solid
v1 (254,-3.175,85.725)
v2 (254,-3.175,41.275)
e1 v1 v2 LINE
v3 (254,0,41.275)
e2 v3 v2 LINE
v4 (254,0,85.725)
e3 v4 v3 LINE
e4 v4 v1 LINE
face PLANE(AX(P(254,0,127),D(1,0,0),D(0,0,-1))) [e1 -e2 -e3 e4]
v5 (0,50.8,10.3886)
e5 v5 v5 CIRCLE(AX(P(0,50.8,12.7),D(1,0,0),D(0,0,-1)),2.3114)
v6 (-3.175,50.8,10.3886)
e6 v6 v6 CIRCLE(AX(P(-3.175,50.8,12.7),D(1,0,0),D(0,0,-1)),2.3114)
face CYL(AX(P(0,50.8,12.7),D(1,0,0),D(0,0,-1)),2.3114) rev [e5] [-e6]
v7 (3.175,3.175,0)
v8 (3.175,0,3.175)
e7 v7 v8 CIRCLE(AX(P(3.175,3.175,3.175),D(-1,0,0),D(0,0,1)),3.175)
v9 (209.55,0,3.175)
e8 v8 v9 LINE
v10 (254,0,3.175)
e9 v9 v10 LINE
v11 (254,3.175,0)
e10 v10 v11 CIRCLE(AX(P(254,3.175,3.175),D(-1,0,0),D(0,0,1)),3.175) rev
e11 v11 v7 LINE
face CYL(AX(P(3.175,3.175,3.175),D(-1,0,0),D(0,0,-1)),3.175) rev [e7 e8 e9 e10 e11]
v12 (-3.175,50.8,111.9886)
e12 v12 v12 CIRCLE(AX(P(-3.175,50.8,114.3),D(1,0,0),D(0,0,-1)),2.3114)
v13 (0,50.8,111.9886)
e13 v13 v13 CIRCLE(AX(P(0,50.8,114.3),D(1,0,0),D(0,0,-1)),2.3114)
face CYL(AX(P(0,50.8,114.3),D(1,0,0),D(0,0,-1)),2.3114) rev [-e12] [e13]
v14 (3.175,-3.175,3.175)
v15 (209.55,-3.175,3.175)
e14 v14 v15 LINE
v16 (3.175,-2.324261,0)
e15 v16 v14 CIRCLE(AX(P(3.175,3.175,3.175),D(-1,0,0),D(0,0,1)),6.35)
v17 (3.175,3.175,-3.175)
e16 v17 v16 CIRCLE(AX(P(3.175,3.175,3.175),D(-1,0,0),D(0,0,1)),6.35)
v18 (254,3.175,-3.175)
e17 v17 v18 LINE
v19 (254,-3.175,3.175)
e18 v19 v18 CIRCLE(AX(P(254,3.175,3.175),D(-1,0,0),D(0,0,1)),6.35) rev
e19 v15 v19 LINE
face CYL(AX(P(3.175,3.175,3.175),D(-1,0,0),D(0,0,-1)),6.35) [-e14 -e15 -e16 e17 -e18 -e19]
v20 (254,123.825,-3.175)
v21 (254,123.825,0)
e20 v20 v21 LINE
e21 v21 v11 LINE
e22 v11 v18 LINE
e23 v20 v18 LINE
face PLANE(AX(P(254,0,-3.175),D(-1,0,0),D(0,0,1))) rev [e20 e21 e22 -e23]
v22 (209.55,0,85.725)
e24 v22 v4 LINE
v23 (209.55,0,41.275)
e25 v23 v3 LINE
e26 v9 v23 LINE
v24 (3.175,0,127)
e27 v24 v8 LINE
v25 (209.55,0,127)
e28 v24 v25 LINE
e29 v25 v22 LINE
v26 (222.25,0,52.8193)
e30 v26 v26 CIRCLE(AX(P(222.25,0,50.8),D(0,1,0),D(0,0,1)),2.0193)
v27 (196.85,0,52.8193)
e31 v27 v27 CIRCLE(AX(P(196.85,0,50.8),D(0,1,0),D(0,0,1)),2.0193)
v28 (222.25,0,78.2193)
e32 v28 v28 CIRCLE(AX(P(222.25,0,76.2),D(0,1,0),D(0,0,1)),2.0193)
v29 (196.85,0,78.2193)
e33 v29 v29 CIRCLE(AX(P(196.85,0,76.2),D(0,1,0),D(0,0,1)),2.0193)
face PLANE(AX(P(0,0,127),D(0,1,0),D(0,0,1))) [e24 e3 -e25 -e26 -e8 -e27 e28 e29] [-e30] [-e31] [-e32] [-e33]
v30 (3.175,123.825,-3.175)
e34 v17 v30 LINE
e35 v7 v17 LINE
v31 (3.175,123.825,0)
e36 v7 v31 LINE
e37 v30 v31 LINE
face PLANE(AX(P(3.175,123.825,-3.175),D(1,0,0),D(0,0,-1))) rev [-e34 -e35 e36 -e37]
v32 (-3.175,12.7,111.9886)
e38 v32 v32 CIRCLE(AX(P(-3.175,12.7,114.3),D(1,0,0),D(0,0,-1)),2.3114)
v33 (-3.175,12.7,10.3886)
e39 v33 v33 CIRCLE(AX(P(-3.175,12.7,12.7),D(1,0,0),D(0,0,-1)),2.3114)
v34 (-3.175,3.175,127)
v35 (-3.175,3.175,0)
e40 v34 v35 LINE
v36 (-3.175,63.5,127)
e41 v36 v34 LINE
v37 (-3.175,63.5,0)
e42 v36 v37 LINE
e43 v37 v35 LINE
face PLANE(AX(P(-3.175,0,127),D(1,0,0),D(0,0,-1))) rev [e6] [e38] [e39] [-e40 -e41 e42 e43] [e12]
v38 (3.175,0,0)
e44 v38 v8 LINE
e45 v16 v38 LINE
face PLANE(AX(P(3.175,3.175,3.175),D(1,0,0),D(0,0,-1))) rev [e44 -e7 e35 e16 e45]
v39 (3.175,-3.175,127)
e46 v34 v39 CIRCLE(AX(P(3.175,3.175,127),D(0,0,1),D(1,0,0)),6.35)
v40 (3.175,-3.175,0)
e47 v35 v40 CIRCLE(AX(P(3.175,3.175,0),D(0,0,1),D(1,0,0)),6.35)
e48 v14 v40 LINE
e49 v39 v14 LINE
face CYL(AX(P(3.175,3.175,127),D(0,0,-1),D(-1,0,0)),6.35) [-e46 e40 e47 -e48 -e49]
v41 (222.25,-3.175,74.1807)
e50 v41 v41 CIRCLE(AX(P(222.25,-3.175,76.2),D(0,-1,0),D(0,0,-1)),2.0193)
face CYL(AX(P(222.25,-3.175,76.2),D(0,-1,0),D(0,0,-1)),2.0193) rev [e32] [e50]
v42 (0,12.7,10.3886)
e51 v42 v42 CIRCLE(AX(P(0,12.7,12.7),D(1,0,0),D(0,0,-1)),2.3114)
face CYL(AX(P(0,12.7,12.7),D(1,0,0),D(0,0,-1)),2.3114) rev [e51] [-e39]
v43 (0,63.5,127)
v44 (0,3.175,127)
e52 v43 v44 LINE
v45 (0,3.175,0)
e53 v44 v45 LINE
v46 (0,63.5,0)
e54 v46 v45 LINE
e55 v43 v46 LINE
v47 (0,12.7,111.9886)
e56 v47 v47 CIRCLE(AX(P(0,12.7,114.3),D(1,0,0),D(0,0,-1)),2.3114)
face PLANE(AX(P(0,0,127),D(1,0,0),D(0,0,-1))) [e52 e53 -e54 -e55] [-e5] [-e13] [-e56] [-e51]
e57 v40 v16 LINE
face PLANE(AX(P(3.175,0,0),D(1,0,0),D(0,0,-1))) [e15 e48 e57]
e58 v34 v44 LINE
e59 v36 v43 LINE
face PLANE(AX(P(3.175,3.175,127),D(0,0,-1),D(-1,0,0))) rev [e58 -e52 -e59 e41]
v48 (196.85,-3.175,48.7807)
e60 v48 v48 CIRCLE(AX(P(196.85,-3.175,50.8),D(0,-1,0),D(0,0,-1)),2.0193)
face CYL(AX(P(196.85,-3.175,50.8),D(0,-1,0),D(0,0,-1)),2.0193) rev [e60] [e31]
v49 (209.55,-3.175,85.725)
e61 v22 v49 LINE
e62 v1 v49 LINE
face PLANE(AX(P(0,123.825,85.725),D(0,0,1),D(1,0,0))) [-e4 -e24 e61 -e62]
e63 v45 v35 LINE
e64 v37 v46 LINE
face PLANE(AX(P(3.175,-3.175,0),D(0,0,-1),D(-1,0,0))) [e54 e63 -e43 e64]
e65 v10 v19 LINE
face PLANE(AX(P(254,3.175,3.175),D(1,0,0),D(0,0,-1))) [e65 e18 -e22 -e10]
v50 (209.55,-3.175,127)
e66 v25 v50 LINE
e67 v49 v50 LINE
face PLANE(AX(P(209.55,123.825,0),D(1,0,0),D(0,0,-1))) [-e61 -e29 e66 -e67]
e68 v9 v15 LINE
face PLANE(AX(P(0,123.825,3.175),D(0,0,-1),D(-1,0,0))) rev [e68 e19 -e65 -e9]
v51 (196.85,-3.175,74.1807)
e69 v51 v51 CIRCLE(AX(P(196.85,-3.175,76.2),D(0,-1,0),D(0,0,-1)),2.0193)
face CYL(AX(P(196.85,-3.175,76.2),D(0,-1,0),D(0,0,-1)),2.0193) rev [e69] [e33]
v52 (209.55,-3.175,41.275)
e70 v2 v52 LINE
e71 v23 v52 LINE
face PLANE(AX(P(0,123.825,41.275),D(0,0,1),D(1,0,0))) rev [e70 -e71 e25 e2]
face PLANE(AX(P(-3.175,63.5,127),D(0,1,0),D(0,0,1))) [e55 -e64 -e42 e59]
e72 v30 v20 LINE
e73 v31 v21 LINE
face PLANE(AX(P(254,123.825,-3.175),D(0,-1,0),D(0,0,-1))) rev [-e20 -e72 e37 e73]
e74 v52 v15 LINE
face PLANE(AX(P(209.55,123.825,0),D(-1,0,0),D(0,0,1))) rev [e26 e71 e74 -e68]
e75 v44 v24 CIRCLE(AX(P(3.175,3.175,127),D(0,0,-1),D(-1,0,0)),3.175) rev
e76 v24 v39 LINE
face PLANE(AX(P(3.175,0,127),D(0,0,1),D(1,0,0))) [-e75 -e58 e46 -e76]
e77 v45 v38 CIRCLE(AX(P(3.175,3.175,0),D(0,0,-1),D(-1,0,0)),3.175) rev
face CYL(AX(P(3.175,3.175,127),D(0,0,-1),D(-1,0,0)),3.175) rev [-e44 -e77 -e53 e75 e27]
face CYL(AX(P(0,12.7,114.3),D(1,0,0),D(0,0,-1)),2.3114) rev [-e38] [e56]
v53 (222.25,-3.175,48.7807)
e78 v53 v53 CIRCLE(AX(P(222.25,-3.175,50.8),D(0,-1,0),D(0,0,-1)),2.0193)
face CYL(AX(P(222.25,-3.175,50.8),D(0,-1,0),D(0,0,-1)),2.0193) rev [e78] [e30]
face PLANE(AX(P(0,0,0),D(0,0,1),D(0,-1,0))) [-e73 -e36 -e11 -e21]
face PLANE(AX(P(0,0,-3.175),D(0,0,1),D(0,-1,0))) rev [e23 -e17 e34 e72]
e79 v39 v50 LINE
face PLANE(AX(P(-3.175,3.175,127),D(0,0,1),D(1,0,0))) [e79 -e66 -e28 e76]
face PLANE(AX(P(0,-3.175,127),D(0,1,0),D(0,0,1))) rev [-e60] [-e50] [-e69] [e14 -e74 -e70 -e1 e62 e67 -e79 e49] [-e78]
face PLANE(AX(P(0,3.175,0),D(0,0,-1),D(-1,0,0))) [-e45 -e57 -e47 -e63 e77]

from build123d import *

# Parameters (mm, degrees)
BASE_FLANGE4_DEPTH           = 127
EDGE_FLANGE1_STRIP_W         = 19.05
EDGE_FLANGE1_STRIP_H         = 3.175
EDGE_FLANGE1_STRIP_CUT_DEPTH = 250.825
EDGE_FLANGE1_DEPTH           = 250.825
SKETCH28_W                   = 44.45
SKETCH28_H                   = 41.275
SKETCH28_H_2                 = 38.1
CUT_EXTRUDE1_DEPTH           = 312.085197333
F_10_32_TAPPED_HOLE1_D       = 4.0386
F_12_28_TAPPED_HOLE1_D       = 4.6228


# Sheet-metal steps are written as plain solids
with BuildPart() as part:
    # Sketch1 → Base-Flange4 (new body)
    with BuildSketch(Plane.XY):
        with BuildLine():
            Line((254, 0), (3.175, 0))
            ThreePointArc((3.175, 0), (0.92993597, 0.92993597), (0, 3.175))
            Line((0, 3.175), (0, 63.5))
            Line((0, 63.5), (-3.175, 63.5))
            Line((-3.175, 63.5), (-3.175, 3.175))
            ThreePointArc((-3.175, 3.175), (-1.315128061, -1.315128061), (3.175, -3.175))
            Line((3.175, -3.175), (254, -3.175))
            Line((254, -3.175), (254, 0))
        make_face()
    extrude(amount=BASE_FLANGE4_DEPTH)

    # Edge-Flange1 strip (across the edge) → Edge-Flange1 strip cut (cut)
    with BuildSketch(Plane.ZY.offset(-254)):
        with Locations((-6.35, -1.5875)):
            Rectangle(EDGE_FLANGE1_STRIP_W, EDGE_FLANGE1_STRIP_H)
    extrude(amount=EDGE_FLANGE1_STRIP_CUT_DEPTH, mode=Mode.SUBTRACT)

    # Edge-Flange1 section (across the edge) → Edge-Flange1 (add)
    with BuildSketch(Plane.ZY.offset(-254)):
        with BuildLine():
            Line((-3.175, 3.175), (-3.175, 123.825))
            Line((-3.175, 123.825), (0, 123.825))
            Line((0, 123.825), (0, 3.175))
            ThreePointArc((0, 3.175), (0.92993597, 0.92993597), (3.175, 0))
            Line((3.175, 0), (3.175, -3.175))
            ThreePointArc((3.175, -3.175), (-1.315128061, -1.315128061), (-3.175, 3.175))
        make_face()
    extrude(amount=EDGE_FLANGE1_DEPTH)

    # Sketch28 → Cut-Extrude1 (cut, through all)
    with BuildSketch(Plane.XZ.offset(3.175)):
        with Locations((231.775, 106.3625)):
            Rectangle(SKETCH28_W, SKETCH28_H)
        with Locations((231.775, 22.225)):
            Rectangle(SKETCH28_W, SKETCH28_H_2)
    extrude(amount=-CUT_EXTRUDE1_DEPTH, mode=Mode.SUBTRACT)

    # #10-32 Tapped Hole1 (through all)
    with Locations(Plane(origin=(0, -3.175, 0), x_dir=(-1, 0, 0), z_dir=(0, -1, 0))):
        with Locations((-222.25, -50.8), (-196.85, -50.8), (-196.85, -76.2), (-222.25, -76.2)):
            Hole(F_10_32_TAPPED_HOLE1_D / 2)

    # #12-28 Tapped Hole1 (through all)
    with Locations(Plane(origin=(0, 0, 0), x_dir=(0, 0, -1), z_dir=(1, 0, 0))):
        with Locations((-12.7, 50.8), (-12.7, 12.7), (-114.3, 12.7), (-114.3, 50.8)):
            Hole(F_12_28_TAPPED_HOLE1_D / 2)


solid = part.part
